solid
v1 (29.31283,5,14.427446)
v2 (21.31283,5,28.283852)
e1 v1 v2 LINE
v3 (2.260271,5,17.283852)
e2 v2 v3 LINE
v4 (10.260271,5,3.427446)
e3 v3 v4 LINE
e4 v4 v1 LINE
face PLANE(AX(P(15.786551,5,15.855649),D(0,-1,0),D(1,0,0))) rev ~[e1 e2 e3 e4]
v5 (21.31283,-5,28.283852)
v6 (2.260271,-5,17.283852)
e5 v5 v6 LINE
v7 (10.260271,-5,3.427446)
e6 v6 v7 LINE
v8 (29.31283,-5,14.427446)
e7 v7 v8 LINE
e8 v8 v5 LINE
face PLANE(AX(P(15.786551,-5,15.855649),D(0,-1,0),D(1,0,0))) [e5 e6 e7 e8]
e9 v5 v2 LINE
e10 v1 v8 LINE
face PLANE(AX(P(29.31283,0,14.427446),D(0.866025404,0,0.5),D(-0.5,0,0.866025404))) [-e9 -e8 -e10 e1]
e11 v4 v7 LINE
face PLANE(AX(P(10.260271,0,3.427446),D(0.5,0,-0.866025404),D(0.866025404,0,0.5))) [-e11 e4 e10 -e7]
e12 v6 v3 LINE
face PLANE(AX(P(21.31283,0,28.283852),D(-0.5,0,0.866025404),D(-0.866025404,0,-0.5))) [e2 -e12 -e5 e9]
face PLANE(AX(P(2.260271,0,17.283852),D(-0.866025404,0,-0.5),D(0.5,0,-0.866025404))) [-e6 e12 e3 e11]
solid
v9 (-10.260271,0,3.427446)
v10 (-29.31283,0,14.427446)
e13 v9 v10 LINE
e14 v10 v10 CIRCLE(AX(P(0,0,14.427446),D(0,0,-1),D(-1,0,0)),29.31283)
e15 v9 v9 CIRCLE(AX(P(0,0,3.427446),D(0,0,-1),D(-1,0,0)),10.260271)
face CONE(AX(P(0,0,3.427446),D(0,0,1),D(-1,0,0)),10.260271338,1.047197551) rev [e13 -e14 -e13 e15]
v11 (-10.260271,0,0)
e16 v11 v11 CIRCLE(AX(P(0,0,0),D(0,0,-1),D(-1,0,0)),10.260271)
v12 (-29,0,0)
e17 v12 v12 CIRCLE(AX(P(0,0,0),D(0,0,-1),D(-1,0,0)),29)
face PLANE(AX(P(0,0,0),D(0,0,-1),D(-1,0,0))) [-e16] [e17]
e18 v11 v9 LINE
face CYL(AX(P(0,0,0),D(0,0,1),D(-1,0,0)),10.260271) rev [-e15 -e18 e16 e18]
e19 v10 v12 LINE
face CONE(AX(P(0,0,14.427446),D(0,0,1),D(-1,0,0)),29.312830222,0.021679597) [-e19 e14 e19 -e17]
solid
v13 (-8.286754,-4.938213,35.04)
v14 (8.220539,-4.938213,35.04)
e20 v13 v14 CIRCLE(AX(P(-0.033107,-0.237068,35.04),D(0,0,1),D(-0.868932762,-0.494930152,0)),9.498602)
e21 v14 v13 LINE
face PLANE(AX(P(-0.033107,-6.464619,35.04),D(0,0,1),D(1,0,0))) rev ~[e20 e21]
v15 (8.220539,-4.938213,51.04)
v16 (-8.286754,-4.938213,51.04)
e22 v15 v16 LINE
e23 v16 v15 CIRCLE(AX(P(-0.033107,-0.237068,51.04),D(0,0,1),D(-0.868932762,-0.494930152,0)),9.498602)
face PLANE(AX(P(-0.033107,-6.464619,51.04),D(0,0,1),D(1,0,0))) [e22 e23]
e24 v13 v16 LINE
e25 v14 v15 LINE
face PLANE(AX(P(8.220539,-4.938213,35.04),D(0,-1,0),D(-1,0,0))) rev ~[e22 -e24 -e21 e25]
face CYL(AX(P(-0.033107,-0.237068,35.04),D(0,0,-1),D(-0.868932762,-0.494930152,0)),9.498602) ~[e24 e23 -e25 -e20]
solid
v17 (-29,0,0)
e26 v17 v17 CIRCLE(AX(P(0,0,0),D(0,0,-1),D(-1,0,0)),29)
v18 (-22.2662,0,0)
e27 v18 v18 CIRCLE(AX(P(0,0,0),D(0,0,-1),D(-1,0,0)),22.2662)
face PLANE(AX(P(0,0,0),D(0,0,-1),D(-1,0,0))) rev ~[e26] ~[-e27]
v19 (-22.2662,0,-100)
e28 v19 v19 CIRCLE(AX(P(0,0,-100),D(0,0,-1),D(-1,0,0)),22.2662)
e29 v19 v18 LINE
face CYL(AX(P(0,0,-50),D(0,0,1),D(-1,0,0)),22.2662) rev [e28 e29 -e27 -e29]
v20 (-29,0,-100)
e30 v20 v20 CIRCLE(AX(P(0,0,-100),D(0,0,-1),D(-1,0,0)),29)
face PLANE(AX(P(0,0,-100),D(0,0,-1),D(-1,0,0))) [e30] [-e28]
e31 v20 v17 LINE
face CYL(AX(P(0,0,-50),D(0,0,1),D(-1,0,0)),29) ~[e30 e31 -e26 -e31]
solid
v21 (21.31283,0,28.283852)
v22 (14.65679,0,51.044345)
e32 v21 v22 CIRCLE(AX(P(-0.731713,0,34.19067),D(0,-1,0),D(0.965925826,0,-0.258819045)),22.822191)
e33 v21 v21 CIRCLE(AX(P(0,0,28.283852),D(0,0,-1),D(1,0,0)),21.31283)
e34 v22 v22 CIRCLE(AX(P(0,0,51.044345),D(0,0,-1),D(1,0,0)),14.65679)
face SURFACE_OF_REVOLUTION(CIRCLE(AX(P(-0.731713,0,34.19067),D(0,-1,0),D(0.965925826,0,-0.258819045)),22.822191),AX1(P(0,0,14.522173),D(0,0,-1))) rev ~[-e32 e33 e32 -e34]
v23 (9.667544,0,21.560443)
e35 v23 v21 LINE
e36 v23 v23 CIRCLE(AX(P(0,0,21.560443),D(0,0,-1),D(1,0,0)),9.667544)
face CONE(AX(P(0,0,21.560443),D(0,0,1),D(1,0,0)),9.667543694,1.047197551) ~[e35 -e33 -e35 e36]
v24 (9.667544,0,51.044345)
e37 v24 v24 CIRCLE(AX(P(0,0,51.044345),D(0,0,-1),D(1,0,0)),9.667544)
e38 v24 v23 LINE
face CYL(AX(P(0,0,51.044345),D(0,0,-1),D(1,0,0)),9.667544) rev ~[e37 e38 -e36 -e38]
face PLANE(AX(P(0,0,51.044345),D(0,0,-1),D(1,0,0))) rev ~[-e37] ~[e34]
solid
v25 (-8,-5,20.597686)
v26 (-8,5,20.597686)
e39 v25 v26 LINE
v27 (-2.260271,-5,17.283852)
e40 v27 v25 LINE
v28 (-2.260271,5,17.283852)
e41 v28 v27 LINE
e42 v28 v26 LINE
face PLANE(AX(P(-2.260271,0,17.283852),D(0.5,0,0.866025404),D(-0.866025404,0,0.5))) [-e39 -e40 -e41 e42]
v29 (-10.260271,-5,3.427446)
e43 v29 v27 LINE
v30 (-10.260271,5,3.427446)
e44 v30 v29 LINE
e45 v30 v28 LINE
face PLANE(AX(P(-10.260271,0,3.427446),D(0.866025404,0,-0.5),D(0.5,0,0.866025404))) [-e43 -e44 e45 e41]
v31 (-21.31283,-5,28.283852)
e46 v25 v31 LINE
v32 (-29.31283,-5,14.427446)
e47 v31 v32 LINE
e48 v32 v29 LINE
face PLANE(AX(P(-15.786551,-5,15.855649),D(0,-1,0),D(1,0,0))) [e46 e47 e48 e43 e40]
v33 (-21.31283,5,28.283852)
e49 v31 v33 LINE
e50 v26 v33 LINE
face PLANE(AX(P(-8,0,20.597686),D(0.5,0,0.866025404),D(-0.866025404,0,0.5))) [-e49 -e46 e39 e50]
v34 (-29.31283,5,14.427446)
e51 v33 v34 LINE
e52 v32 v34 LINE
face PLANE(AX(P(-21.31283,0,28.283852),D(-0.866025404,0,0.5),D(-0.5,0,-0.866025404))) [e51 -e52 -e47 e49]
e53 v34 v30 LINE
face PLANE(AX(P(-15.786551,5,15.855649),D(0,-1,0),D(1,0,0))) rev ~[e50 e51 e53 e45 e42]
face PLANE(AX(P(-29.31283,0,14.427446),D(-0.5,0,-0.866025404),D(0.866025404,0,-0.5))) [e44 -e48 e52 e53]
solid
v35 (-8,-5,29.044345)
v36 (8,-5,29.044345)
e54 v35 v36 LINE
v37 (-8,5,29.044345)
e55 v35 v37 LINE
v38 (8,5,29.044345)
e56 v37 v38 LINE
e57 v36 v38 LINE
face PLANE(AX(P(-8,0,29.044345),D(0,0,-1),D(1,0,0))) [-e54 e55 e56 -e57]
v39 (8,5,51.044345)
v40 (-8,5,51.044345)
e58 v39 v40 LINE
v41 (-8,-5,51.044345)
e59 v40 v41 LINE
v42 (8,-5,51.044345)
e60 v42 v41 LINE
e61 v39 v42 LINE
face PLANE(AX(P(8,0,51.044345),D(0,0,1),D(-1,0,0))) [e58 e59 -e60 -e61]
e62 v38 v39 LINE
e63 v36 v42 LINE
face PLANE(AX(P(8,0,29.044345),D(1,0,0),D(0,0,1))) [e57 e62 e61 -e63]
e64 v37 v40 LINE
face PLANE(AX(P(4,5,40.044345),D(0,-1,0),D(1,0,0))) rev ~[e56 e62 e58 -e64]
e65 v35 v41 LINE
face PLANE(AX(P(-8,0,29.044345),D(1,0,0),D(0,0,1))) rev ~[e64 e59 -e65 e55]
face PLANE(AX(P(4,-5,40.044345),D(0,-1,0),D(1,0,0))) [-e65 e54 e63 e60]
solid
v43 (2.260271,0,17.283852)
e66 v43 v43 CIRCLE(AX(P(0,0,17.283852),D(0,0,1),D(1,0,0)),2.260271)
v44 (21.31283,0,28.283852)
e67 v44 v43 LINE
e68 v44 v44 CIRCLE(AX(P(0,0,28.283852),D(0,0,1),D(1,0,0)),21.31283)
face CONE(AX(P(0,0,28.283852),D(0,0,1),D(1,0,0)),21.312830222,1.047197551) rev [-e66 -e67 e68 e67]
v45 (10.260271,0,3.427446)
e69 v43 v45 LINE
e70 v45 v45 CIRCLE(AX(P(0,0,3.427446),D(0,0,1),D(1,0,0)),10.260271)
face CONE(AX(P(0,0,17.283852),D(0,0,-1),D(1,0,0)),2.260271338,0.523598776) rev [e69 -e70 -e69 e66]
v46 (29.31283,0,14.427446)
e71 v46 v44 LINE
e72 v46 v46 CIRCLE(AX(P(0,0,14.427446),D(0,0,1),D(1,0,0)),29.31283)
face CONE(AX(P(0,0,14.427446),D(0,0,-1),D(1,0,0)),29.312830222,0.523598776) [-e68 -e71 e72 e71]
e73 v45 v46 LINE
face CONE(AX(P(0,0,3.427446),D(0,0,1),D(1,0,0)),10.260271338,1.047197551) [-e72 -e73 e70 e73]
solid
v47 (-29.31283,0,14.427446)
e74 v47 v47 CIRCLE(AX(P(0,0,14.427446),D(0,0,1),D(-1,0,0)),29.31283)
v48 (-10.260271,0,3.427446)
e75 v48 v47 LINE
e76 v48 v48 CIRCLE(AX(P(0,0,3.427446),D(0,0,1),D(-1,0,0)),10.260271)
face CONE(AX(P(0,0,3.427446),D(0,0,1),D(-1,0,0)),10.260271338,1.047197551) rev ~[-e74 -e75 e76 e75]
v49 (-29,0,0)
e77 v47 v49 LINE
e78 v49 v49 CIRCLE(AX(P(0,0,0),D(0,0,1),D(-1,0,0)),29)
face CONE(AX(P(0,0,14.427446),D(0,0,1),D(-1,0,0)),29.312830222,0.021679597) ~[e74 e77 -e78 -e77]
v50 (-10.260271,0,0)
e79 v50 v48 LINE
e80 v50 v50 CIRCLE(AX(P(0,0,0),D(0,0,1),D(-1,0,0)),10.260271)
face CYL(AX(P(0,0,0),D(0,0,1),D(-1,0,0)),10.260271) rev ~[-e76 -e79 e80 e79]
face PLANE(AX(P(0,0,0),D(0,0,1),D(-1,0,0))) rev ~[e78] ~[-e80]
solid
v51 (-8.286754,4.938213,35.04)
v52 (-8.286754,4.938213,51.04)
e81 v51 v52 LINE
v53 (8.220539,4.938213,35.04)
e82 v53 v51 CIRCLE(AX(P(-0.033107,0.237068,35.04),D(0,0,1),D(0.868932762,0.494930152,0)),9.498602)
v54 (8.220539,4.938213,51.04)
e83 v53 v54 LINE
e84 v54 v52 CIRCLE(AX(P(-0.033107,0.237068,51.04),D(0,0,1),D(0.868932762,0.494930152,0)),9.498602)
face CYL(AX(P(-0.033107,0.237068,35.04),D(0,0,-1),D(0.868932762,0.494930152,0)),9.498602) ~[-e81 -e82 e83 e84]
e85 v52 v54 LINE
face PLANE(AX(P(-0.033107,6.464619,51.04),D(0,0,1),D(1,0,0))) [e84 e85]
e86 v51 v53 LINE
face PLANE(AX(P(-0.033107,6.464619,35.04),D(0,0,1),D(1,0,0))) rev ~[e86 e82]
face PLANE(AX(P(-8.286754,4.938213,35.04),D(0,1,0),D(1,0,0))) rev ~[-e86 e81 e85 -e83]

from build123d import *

# Parameters (mm, degrees)
F1_DEPTH = 5
F0_W     = 8
F0_H     = 22
F0_W_2   = 6.7338001877
F0_H_2   = 100
F5_DEPTH = 16
F7_DEPTH = 16


# Not quite as in the source:
# - after a boolean that leaves OpenCascade's solid faulty, fix() repairs it


with BuildPart() as f1:
    # F0 (on Front) → F1 (new body, symmetric)
    with BuildSketch(Plane.XZ):
        Polygon((2.2602713382, 17.2838520708), (10.2602713382, 3.4274456103), (29.3128302215, 14.4274456103), (21.3128302215, 28.2838520708), (9.6675436944, 21.5604427596), align=None)
    extrude(amount=F1_DEPTH, both=True)


with BuildPart() as f1b:
    # F0 (on Front) → F1, piece 2 (new body, symmetric)
    with BuildSketch(Plane.XZ):
        Polygon((-29.3128302215, 14.4274456103), (-10.2602713382, 3.4274456103), (-2.2602713382, 17.2838520708), (-8, 20.5976859588), (-21.3128302215, 28.2838520708), align=None)
    extrude(amount=F1_DEPTH, both=True)


with BuildPart() as f1c:
    # F0 (on Front) → F1, piece 3 (new body, symmetric)
    with BuildSketch(Plane.XZ):
        with Locations((4, 40.0443450212)):
            Rectangle(F0_W, F0_H)
        with Locations((-4, 40.0443450212)):
            Rectangle(F0_W, F0_H)
    extrude(amount=F1_DEPTH, both=True)


with BuildPart() as f2:
    # F0 (on Front) → F2 (revolve)
    with BuildSketch(Plane.XZ):
        with Locations((-25.6330999061, -50)):
            Rectangle(F0_W_2, F0_H_2)
    revolve(axis=Axis((0, 0, -50), (0, 0, -1)))


with BuildPart() as f3:
    # F0 (on Front) → F3 (revolve)
    with BuildSketch(Plane.XZ):
        with BuildLine():
            Line((9.6675436944, 21.5604427596), (21.3128302215, 28.2838520708))
            ThreePointArc((21.3128302215, 28.2838520708), (21.1730407744, 40.5964594654), (14.6567896008, 51.0443450212))
            Line((14.6567896008, 51.0443450212), (9.6675436944, 51.0443450212))
            Line((9.6675436944, 51.0443450212), (9.6675436944, 21.5604427596))
        make_face()
    revolve(axis=Axis((0, 0, 14.5221725106), (0, 0, -1)))


with BuildPart() as f5:
    # F4 (on Top) → F5 (new body)
    with BuildSketch(Plane.XY):
        with BuildLine():
            ThreePointArc((-8.2867536694, -4.938212689), (-0.0331071205, -9.7356702002), (8.2205394283, -4.938212689))
            Line((8.2205394283, -4.938212689), (-8.2867536694, -4.938212689))
        make_face()
    extrude(amount=F5_DEPTH)


with BuildPart() as f5_1:
    # F6: moved
    add(f5.part.moved(Location((0, 0, 35.04))))


with BuildPart() as f7:
    # F4 (on Top) → F7 (new body)
    with BuildSketch(Plane.XY):
        with BuildLine():
            Line((-8.2867536694, 4.938212689), (8.2205394283, 4.938212689))
            ThreePointArc((8.2205394283, 4.938212689), (-0.0331071205, 9.7356702002), (-8.2867536694, 4.938212689))
        make_face()
    extrude(amount=F7_DEPTH)


with BuildPart() as f7_1:
    # F8: moved
    add(f7.part.moved(Location((0, 0, 35.04))))


with BuildPart() as f9:
    # F0 (on Front) → F9 (revolve)
    with BuildSketch(Plane.XZ):
        Polygon((-10.2602713382, 0), (-10.2602713382, 3.4274456103), (-29.3128302215, 14.4274456103), (-29, 0), (-22.2661998123, 0), align=None)
    revolve(axis=Axis((0, 0, 25.5221725106), (0, 0, 1)))


with BuildPart() as f10:
    # F0 (on Front) → F10 (revolve)
    with BuildSketch(Plane.XZ):
        Polygon((-10.2602713382, 0), (-10.2602713382, 3.4274456103), (-29.3128302215, 14.4274456103), (-29, 0), (-22.2661998123, 0), align=None)
    revolve(axis=Axis((0, 0, -50), (0, 0, -1)))


with BuildPart() as f11:
    # F0 (on Front) → F11 (revolve)
    with BuildSketch(Plane.XZ):
        Polygon((2.2602713382, 17.2838520708), (10.2602713382, 3.4274456103), (29.3128302215, 14.4274456103), (21.3128302215, 28.2838520708), (9.6675436944, 21.5604427596), align=None)
    revolve(axis=Axis((0, 0, 25.5221725106), (0, 0, 1)))

    add(f11.part.fix(), mode=Mode.REPLACE)


solid = Compound([f1.part, f1b.part, f1c.part, f2.part, f3.part, f5_1.part, f7_1.part, f9.part, f10.part, f11.part])
